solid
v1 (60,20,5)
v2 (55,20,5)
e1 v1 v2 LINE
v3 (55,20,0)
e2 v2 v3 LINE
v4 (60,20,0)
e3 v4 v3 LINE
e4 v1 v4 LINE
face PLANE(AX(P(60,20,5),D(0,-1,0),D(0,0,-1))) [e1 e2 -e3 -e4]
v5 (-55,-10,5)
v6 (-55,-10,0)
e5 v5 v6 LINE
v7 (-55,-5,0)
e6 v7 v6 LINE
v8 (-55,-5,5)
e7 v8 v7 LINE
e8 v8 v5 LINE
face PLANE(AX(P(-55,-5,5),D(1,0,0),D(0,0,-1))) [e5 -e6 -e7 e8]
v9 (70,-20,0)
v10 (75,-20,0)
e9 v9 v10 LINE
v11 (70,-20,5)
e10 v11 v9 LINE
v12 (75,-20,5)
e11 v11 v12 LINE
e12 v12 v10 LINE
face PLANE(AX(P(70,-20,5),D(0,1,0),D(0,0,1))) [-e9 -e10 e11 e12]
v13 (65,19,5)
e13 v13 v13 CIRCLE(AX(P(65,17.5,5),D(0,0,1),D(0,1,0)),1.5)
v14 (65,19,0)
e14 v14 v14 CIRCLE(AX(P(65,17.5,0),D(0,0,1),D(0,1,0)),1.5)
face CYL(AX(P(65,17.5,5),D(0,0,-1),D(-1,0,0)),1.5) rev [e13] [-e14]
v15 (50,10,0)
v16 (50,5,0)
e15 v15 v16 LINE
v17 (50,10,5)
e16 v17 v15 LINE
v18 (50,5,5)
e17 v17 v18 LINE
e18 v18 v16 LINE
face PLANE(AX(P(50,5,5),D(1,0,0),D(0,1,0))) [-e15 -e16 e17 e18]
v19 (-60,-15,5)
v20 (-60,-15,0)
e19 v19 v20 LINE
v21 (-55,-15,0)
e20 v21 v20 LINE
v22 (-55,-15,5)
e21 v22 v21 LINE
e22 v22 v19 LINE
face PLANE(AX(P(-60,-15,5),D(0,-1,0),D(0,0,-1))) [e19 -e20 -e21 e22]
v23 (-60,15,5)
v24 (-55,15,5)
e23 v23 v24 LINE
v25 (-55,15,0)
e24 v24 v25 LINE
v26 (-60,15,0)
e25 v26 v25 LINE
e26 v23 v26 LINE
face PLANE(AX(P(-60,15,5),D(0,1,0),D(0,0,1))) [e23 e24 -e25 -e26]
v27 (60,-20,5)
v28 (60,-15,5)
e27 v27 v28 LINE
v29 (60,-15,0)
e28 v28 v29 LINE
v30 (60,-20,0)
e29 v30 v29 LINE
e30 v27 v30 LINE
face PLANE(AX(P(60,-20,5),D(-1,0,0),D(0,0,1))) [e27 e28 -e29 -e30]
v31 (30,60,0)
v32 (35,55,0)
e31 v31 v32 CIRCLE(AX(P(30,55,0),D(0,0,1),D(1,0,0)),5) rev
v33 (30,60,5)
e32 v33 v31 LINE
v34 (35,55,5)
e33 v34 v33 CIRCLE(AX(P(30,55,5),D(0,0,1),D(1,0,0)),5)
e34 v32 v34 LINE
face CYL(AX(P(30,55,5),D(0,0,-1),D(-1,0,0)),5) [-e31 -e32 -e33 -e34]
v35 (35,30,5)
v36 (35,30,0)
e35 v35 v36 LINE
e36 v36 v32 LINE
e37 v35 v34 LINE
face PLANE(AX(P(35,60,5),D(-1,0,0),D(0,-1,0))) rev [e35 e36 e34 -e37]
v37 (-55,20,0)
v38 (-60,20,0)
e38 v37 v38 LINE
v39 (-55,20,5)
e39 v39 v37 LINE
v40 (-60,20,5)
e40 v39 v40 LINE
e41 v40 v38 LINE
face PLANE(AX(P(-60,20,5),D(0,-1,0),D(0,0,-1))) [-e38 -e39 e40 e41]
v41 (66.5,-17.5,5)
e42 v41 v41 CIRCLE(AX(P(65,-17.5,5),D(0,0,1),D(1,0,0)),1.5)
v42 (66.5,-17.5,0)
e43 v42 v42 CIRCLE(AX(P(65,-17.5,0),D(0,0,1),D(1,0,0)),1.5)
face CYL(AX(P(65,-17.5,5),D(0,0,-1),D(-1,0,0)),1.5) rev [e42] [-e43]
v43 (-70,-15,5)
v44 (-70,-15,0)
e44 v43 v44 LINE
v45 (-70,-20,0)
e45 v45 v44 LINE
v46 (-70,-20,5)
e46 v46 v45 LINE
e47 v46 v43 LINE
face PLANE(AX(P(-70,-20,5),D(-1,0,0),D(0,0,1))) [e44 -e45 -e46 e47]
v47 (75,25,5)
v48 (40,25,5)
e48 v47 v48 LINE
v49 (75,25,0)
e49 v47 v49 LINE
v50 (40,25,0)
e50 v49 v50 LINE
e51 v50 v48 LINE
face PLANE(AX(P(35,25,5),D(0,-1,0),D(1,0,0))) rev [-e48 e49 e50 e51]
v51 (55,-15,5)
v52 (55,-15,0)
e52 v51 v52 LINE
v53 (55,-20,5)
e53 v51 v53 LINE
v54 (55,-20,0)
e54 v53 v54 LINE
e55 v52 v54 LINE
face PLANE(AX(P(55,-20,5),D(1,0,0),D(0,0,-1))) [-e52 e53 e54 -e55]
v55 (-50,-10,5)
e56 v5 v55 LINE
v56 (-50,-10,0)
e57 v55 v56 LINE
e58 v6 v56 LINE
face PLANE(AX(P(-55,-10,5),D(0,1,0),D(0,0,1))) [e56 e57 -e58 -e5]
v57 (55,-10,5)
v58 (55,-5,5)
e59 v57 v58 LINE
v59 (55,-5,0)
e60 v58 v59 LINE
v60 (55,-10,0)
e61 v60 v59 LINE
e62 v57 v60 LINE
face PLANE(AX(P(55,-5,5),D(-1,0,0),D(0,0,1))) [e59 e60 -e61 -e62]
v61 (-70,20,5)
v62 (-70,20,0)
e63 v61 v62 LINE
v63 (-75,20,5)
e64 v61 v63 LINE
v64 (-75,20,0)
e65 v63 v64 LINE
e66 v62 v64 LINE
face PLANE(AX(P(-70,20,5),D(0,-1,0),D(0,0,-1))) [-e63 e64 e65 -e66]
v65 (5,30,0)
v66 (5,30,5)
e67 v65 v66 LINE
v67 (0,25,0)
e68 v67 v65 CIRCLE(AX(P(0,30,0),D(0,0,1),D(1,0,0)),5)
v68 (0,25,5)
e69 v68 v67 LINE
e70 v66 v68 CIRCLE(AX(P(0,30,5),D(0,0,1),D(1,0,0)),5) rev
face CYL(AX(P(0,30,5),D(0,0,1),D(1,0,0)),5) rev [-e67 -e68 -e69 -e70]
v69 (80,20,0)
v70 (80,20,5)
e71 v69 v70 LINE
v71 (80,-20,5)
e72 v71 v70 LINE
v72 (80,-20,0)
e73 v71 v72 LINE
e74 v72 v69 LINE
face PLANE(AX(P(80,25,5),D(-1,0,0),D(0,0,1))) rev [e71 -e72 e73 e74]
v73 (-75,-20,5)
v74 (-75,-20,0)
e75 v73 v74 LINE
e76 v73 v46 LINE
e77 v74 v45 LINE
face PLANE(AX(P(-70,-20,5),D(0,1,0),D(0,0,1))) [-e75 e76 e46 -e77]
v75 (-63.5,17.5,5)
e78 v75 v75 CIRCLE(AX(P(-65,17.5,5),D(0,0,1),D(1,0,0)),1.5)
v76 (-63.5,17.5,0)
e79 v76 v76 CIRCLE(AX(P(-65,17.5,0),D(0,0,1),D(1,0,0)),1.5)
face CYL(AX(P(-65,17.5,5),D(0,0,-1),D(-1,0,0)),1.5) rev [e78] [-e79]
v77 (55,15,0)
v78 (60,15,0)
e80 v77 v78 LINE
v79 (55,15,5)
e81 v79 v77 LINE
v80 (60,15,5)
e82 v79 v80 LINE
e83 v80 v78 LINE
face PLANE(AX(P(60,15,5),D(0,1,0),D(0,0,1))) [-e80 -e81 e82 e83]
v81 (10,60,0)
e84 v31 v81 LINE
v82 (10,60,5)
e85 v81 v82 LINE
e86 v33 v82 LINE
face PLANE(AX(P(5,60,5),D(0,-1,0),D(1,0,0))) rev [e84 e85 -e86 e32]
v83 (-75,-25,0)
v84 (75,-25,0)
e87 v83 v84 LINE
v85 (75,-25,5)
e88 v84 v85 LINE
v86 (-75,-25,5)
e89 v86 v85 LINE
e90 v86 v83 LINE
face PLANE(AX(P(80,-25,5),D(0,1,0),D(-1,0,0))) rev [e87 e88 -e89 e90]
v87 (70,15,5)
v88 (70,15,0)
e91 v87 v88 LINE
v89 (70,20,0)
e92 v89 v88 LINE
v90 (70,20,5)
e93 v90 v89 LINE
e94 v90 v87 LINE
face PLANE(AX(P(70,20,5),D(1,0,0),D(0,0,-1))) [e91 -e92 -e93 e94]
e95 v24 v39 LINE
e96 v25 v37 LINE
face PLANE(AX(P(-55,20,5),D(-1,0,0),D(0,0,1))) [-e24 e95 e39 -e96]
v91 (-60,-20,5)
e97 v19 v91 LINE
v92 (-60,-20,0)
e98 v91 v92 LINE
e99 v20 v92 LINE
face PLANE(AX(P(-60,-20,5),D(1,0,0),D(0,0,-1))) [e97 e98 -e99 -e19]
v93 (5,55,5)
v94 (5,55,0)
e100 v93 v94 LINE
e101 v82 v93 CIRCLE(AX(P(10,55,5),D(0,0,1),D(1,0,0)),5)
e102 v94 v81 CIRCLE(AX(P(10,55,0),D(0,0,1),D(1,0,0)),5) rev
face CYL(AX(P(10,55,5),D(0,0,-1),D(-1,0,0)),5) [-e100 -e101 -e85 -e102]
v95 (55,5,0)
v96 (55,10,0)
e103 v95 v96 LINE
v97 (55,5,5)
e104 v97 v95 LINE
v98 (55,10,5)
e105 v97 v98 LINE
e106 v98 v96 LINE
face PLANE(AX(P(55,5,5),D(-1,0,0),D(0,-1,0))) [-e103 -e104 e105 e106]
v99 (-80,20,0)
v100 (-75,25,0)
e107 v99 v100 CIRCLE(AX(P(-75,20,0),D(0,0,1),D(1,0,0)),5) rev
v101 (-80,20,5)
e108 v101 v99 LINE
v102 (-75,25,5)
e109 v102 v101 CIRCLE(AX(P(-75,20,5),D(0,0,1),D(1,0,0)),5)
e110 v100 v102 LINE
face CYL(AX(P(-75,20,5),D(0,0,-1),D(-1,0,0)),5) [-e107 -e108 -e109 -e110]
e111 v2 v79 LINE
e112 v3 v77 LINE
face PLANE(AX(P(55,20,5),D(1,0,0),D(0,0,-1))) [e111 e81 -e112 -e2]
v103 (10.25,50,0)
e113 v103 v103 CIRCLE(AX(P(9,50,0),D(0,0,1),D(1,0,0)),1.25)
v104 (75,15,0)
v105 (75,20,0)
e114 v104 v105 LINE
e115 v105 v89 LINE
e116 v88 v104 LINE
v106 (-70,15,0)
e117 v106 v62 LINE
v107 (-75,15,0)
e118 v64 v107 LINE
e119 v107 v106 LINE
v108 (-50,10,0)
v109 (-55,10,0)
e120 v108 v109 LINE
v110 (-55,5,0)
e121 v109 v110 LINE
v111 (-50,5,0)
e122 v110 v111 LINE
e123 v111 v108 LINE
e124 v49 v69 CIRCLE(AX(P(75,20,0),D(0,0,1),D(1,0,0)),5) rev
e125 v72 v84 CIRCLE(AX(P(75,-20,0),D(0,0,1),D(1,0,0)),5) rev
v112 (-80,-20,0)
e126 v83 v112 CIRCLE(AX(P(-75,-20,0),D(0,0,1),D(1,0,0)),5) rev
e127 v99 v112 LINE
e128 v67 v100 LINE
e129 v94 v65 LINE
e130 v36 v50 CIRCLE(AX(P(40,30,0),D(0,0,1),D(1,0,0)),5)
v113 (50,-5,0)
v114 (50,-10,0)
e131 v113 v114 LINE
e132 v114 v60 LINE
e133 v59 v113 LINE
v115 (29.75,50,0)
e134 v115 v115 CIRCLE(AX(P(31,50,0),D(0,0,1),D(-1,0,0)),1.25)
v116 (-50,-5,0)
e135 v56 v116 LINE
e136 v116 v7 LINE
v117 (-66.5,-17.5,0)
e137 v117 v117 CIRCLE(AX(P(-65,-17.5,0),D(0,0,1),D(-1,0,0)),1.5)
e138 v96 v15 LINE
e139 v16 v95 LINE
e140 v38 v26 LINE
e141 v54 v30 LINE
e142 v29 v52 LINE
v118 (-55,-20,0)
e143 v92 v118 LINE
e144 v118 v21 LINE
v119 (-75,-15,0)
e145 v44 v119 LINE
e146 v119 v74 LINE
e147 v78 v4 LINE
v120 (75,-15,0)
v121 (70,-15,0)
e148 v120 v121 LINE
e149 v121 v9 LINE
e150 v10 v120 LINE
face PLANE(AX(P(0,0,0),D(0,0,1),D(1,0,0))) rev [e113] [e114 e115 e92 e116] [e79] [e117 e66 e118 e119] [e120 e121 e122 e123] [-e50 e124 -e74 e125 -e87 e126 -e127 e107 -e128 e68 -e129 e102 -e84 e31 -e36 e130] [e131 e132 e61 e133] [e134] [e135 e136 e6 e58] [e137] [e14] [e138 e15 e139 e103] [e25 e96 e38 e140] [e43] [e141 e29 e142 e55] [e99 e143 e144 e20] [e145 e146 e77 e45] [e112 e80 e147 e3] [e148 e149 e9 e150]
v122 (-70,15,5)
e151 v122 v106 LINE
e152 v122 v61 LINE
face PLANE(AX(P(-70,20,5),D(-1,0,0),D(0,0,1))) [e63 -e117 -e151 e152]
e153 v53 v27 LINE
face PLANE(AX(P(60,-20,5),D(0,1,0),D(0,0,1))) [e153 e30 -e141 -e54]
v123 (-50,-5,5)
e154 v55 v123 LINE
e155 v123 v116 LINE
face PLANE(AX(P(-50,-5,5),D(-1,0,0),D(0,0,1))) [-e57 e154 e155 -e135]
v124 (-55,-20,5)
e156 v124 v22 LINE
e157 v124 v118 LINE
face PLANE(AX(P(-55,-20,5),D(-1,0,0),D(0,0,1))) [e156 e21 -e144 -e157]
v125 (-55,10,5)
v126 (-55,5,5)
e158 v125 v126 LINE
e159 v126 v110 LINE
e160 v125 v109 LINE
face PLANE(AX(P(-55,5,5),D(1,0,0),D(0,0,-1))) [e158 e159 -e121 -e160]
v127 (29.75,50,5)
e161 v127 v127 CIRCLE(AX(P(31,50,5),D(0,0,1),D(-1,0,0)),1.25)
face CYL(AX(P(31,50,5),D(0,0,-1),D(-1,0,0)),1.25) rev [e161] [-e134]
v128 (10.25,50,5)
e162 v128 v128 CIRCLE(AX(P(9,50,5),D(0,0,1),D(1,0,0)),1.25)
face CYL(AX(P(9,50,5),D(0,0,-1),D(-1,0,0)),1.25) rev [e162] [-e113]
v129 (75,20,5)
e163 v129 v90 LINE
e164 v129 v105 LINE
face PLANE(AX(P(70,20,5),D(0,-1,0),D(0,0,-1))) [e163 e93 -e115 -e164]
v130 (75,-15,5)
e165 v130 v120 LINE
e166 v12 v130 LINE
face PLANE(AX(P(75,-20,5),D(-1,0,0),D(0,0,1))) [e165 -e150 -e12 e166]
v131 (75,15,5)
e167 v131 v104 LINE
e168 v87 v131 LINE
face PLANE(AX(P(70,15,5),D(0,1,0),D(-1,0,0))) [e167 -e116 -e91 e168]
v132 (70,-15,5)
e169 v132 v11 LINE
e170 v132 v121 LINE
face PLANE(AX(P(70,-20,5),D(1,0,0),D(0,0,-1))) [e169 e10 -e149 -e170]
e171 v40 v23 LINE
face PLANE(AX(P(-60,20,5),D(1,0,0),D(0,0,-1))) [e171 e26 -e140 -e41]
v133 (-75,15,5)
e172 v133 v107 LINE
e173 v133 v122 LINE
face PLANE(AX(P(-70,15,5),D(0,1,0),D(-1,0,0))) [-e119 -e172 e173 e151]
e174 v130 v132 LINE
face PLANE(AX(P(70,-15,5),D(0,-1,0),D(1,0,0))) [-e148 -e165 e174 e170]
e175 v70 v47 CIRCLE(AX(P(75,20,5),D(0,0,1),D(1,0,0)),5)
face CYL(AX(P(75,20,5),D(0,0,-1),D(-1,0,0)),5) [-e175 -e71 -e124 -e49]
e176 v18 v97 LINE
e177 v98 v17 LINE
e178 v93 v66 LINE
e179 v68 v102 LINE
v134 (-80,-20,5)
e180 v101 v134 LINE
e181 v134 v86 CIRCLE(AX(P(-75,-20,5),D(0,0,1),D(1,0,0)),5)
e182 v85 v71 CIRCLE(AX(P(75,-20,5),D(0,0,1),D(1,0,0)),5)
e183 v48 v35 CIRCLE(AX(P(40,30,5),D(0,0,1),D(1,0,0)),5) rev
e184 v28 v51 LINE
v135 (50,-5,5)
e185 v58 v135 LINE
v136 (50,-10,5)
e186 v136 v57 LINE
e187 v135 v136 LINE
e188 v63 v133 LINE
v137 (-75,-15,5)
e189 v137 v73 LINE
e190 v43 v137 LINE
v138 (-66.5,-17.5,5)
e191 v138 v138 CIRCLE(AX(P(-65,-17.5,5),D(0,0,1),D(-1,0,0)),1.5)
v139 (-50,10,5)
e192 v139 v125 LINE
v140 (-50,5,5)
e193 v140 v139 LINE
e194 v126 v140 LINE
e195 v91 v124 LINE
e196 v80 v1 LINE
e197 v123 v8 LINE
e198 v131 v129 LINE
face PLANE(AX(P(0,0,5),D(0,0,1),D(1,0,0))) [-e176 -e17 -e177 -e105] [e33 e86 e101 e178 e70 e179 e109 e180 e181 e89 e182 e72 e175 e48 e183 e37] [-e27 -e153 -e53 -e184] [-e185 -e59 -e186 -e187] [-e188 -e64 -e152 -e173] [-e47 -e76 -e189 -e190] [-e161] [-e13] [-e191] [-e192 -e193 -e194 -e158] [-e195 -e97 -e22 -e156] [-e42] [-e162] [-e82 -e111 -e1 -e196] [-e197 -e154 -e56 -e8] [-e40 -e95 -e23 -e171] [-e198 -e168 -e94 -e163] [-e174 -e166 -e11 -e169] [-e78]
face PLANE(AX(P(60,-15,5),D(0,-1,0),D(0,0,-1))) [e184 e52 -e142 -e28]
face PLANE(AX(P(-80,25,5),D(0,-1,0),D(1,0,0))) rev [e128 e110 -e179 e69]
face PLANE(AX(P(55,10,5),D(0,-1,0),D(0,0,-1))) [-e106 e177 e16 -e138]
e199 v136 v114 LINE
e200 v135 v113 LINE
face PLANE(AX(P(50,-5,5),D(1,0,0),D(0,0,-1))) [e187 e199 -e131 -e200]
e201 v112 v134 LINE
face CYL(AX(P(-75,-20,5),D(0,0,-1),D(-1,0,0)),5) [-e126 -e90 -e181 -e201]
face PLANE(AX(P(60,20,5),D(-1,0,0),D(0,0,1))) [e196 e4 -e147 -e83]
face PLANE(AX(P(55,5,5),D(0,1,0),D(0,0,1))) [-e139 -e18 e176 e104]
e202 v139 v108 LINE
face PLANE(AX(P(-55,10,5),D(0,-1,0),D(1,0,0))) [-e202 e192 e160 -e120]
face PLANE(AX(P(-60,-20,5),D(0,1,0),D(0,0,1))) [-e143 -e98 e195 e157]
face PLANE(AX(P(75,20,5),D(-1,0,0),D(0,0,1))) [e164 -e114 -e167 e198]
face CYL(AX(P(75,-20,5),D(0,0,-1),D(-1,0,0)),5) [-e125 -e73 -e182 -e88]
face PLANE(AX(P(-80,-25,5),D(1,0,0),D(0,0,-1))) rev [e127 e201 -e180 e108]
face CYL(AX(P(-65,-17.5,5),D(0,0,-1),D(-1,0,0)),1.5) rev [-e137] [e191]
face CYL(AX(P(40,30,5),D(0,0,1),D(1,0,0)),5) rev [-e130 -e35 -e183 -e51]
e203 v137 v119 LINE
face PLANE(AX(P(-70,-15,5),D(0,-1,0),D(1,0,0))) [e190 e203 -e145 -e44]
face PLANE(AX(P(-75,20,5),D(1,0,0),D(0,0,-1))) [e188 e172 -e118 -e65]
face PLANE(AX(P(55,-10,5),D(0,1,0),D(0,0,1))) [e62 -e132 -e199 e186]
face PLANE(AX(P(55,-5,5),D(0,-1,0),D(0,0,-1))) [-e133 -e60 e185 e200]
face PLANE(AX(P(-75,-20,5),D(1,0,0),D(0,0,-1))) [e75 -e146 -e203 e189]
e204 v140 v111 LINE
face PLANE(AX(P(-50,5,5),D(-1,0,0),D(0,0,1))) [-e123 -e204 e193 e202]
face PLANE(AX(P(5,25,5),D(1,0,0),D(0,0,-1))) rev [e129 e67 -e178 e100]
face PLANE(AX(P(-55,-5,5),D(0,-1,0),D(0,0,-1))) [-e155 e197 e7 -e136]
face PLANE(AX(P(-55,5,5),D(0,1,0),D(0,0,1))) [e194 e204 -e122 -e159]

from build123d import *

# Parameters (mm, degrees)
BOSS_EXTRUDE1_OUTLINE_W   = 5
BOSS_EXTRUDE1_OUTLINE_H   = 5
BOSS_EXTRUDE1_OUTLINE_R   = 1.5
BOSS_EXTRUDE1_OUTLINE_R_2 = 1.25
BOSS_EXTRUDE1_DEPTH       = 5
FILLET1_R                 = 5


# Read off the part's stored shape, not the designer's step: Boss-Extrude1
with BuildPart() as part:
    # Boss-Extrude1 outline → Boss-Extrude1 (new body)
    with BuildSketch(Plane.XY):
        Polygon((5, 25), (-80, 25), (-80, -25), (80, -25), (80, 25), (35, 25), (35, 60), (5, 60), align=None)
        with Locations((-72.5, -17.5)):
            Rectangle(BOSS_EXTRUDE1_OUTLINE_W, BOSS_EXTRUDE1_OUTLINE_H, mode=Mode.SUBTRACT)
        with Locations((-65, -17.5)):
            Circle(BOSS_EXTRUDE1_OUTLINE_R, mode=Mode.SUBTRACT)
        with Locations((-57.5, -17.5)):
            Rectangle(BOSS_EXTRUDE1_OUTLINE_W, BOSS_EXTRUDE1_OUTLINE_H, mode=Mode.SUBTRACT)
        with Locations((-52.5, -7.5)):
            Rectangle(BOSS_EXTRUDE1_OUTLINE_W, BOSS_EXTRUDE1_OUTLINE_H, mode=Mode.SUBTRACT)
        with Locations((-52.5, 7.5)):
            Rectangle(BOSS_EXTRUDE1_OUTLINE_W, BOSS_EXTRUDE1_OUTLINE_H, mode=Mode.SUBTRACT)
        with Locations((57.5, -17.5)):
            Rectangle(BOSS_EXTRUDE1_OUTLINE_W, BOSS_EXTRUDE1_OUTLINE_H, mode=Mode.SUBTRACT)
        with Locations((65, -17.5)):
            Circle(BOSS_EXTRUDE1_OUTLINE_R, mode=Mode.SUBTRACT)
        with Locations((72.5, -17.5)):
            Rectangle(BOSS_EXTRUDE1_OUTLINE_W, BOSS_EXTRUDE1_OUTLINE_H, mode=Mode.SUBTRACT)
        with Locations((52.5, -7.5)):
            Rectangle(BOSS_EXTRUDE1_OUTLINE_W, BOSS_EXTRUDE1_OUTLINE_H, mode=Mode.SUBTRACT)
        with Locations((52.5, 7.5)):
            Rectangle(BOSS_EXTRUDE1_OUTLINE_W, BOSS_EXTRUDE1_OUTLINE_H, mode=Mode.SUBTRACT)
        with Locations((-72.5, 17.5)):
            Rectangle(BOSS_EXTRUDE1_OUTLINE_W, BOSS_EXTRUDE1_OUTLINE_H, mode=Mode.SUBTRACT)
        with Locations((-65, 17.5)):
            Circle(BOSS_EXTRUDE1_OUTLINE_R, mode=Mode.SUBTRACT)
        with Locations((-57.5, 17.5)):
            Rectangle(BOSS_EXTRUDE1_OUTLINE_W, BOSS_EXTRUDE1_OUTLINE_H, mode=Mode.SUBTRACT)
        with Locations((57.5, 17.5)):
            Rectangle(BOSS_EXTRUDE1_OUTLINE_W, BOSS_EXTRUDE1_OUTLINE_H, mode=Mode.SUBTRACT)
        with Locations((65, 17.5)):
            Circle(BOSS_EXTRUDE1_OUTLINE_R, mode=Mode.SUBTRACT)
        with Locations((72.5, 17.5)):
            Rectangle(BOSS_EXTRUDE1_OUTLINE_W, BOSS_EXTRUDE1_OUTLINE_H, mode=Mode.SUBTRACT)
        with Locations((9, 50)):
            Circle(BOSS_EXTRUDE1_OUTLINE_R_2, mode=Mode.SUBTRACT)
        with Locations((31, 50)):
            Circle(BOSS_EXTRUDE1_OUTLINE_R_2, mode=Mode.SUBTRACT)
    extrude(amount=BOSS_EXTRUDE1_DEPTH)

    # Fillet1
    fillet1_edges = [part.edges().sort_by_distance(p)[0] for p in [
        (5, 25, 2.5),
        (5, 60, 2.5),
        (35, 60, 2.5),
        (35, 25, 2.5),
        (80, 25, 2.5),
        (80, -25, 2.5),
        (-80, -25, 2.5),
        (-80, 25, 2.5),
    ]]
    fillet(fillet1_edges, radius=FILLET1_R)


solid = part.part
